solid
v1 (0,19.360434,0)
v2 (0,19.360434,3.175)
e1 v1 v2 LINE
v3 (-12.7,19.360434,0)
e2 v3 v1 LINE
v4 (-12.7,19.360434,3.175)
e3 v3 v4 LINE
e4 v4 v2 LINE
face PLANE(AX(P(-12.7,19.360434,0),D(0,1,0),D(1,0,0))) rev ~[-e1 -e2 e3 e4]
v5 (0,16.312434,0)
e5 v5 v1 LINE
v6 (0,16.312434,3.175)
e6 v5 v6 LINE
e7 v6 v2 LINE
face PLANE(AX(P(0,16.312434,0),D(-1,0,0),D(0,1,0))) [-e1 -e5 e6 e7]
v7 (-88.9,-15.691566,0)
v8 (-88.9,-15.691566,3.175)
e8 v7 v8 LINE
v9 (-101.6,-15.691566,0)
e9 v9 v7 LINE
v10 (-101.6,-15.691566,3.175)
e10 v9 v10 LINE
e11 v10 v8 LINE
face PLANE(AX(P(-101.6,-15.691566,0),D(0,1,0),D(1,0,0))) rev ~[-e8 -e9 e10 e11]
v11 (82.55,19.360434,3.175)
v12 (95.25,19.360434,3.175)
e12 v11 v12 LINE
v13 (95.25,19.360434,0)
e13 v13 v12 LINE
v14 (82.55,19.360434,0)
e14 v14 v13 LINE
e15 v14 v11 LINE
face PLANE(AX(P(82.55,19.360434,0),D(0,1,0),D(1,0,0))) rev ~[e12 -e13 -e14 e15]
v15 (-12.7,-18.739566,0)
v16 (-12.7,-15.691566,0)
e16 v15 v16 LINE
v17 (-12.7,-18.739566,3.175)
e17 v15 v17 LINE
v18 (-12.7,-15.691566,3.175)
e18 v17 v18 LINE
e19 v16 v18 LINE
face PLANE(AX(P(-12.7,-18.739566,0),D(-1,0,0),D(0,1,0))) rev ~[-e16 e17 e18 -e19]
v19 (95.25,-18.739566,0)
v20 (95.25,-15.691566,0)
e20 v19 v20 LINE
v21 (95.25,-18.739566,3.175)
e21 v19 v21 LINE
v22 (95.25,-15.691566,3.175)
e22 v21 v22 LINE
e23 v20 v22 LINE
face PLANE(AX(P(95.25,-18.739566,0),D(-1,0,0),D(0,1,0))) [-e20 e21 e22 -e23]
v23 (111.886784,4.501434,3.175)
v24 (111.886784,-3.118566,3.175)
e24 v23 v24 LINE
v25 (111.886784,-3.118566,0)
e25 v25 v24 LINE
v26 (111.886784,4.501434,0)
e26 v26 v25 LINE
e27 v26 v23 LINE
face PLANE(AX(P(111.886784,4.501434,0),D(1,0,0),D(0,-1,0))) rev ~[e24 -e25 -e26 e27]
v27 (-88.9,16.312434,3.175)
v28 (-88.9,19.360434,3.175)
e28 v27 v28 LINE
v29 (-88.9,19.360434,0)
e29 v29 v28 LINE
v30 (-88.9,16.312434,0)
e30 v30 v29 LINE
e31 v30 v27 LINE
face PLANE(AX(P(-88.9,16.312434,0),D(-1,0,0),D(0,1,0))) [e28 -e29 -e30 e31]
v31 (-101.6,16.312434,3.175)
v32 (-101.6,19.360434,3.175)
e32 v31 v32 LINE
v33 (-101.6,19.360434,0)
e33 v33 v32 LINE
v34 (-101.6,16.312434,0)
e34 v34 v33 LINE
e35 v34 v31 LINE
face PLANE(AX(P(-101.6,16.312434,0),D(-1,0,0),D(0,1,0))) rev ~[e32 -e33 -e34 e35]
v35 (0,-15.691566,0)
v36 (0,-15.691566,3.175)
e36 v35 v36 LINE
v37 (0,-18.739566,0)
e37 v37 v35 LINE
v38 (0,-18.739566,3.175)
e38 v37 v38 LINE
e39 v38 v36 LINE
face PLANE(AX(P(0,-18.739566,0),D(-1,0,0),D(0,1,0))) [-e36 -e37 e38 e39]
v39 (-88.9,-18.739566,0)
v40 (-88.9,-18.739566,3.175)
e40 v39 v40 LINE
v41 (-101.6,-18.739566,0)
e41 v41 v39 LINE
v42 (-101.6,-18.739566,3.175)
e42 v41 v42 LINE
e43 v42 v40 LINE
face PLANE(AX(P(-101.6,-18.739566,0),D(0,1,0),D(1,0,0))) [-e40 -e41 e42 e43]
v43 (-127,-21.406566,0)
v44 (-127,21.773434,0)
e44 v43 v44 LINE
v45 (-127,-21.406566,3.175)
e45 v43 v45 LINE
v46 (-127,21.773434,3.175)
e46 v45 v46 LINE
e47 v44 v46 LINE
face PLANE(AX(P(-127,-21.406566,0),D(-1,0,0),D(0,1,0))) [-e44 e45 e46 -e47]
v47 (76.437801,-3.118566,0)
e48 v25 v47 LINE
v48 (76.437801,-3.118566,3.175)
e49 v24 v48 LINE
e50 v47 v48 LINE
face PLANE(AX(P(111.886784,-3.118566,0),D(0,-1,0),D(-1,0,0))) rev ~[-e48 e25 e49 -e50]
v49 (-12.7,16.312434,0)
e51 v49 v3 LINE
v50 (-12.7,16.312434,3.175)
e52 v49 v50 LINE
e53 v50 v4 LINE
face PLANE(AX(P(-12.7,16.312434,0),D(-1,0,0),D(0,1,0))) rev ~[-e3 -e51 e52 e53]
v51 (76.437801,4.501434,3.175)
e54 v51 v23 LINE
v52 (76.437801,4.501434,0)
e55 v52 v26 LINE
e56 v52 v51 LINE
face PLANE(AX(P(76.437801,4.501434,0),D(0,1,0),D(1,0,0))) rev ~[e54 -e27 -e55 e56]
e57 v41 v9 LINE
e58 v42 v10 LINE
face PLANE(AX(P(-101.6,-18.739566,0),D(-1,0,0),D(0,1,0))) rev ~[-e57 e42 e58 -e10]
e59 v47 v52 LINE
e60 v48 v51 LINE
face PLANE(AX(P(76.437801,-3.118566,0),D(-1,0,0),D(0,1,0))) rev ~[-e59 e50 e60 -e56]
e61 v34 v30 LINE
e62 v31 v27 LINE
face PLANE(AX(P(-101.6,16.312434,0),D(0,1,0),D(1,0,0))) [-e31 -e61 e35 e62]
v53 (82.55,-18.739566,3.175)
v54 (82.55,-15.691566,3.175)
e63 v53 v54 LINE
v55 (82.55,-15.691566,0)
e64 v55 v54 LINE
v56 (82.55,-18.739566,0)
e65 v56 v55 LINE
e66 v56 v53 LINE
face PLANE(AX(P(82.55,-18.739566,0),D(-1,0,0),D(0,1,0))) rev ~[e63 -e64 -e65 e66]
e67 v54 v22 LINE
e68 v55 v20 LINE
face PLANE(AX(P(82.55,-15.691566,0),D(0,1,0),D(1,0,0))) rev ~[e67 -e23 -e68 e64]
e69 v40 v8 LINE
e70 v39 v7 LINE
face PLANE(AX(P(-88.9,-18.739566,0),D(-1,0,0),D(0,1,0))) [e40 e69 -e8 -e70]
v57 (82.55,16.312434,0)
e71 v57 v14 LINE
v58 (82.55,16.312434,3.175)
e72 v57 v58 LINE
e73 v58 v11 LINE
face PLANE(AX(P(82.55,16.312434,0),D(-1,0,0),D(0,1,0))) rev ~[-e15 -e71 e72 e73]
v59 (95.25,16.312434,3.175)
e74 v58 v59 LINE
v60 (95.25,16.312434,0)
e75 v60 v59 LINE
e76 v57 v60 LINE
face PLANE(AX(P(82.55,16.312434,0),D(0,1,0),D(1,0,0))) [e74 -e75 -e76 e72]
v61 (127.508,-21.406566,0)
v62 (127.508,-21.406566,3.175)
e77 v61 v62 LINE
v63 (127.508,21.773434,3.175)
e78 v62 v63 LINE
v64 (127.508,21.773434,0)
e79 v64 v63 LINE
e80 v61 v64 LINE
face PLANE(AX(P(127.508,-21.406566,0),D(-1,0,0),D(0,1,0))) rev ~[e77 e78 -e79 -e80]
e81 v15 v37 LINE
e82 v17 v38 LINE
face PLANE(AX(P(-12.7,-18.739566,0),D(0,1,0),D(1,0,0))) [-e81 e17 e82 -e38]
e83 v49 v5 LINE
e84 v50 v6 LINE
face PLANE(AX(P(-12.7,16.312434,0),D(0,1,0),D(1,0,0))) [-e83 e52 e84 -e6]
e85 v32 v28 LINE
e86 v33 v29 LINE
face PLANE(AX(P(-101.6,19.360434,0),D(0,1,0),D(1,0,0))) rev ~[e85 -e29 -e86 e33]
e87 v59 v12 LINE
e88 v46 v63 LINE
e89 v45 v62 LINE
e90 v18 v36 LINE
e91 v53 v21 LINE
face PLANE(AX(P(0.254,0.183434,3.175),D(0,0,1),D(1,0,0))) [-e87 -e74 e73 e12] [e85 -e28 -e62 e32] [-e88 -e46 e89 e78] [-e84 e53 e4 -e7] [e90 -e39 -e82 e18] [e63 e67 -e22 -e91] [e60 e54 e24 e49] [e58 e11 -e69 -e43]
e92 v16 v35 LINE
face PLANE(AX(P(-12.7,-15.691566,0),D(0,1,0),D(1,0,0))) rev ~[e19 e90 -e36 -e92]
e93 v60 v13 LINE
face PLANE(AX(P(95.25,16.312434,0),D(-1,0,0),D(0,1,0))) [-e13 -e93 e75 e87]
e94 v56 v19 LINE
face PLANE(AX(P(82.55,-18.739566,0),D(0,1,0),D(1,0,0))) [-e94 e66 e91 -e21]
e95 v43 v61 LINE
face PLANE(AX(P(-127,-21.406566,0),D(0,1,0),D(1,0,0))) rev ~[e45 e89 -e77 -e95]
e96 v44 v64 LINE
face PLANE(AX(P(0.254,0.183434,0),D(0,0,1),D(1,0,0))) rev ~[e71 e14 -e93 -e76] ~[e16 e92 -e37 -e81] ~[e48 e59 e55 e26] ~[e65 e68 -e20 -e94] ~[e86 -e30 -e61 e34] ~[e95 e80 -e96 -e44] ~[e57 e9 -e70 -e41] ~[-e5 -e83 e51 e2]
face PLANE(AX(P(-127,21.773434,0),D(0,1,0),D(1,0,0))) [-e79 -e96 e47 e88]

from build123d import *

# Parameters (mm, degrees)
F0_W     = 254.508
F0_H     = 43.18
F0_W_2   = 12.7
F0_H_2   = 3.048
F1_DEPTH = 3.175


# Not quite as in the source:
# - a feature names something its author has since deleted; it is built from what else it names


with BuildPart() as f1:
    # F0 (on Top) → F1 (new body)
    with BuildSketch(Plane.XY):
        with Locations((0.254, 0.1834339905)):
            Rectangle(F0_W, F0_H)
        with Locations((-95.25, -17.2155660095)):
            Rectangle(F0_W_2, F0_H_2, mode=Mode.SUBTRACT)
        with Locations((-6.35, -17.2155660095)):
            Rectangle(F0_W_2, F0_H_2, mode=Mode.SUBTRACT)
        with Locations((88.9, -17.2155660095)):
            Rectangle(F0_W_2, F0_H_2, mode=Mode.SUBTRACT)
        with Locations((-95.25, 17.8364339905)):
            Rectangle(F0_W_2, F0_H_2, mode=Mode.SUBTRACT)
        with Locations((-6.35, 17.8364339905)):
            Rectangle(F0_W_2, F0_H_2, mode=Mode.SUBTRACT)
        Polygon((78.9593234658, -3.1185660095), (76.4378011227, -3.1185660095), (76.4378011227, 4.5014339905), (78.9593234658, 4.5014339905), (111.8867844343, 4.5014339905), (111.8867844343, -3.1185660095), align=None, mode=Mode.SUBTRACT)
        with Locations((88.9, 17.8364339905)):
            Rectangle(F0_W_2, F0_H_2, mode=Mode.SUBTRACT)
    extrude(amount=F1_DEPTH)


solid = f1.part
